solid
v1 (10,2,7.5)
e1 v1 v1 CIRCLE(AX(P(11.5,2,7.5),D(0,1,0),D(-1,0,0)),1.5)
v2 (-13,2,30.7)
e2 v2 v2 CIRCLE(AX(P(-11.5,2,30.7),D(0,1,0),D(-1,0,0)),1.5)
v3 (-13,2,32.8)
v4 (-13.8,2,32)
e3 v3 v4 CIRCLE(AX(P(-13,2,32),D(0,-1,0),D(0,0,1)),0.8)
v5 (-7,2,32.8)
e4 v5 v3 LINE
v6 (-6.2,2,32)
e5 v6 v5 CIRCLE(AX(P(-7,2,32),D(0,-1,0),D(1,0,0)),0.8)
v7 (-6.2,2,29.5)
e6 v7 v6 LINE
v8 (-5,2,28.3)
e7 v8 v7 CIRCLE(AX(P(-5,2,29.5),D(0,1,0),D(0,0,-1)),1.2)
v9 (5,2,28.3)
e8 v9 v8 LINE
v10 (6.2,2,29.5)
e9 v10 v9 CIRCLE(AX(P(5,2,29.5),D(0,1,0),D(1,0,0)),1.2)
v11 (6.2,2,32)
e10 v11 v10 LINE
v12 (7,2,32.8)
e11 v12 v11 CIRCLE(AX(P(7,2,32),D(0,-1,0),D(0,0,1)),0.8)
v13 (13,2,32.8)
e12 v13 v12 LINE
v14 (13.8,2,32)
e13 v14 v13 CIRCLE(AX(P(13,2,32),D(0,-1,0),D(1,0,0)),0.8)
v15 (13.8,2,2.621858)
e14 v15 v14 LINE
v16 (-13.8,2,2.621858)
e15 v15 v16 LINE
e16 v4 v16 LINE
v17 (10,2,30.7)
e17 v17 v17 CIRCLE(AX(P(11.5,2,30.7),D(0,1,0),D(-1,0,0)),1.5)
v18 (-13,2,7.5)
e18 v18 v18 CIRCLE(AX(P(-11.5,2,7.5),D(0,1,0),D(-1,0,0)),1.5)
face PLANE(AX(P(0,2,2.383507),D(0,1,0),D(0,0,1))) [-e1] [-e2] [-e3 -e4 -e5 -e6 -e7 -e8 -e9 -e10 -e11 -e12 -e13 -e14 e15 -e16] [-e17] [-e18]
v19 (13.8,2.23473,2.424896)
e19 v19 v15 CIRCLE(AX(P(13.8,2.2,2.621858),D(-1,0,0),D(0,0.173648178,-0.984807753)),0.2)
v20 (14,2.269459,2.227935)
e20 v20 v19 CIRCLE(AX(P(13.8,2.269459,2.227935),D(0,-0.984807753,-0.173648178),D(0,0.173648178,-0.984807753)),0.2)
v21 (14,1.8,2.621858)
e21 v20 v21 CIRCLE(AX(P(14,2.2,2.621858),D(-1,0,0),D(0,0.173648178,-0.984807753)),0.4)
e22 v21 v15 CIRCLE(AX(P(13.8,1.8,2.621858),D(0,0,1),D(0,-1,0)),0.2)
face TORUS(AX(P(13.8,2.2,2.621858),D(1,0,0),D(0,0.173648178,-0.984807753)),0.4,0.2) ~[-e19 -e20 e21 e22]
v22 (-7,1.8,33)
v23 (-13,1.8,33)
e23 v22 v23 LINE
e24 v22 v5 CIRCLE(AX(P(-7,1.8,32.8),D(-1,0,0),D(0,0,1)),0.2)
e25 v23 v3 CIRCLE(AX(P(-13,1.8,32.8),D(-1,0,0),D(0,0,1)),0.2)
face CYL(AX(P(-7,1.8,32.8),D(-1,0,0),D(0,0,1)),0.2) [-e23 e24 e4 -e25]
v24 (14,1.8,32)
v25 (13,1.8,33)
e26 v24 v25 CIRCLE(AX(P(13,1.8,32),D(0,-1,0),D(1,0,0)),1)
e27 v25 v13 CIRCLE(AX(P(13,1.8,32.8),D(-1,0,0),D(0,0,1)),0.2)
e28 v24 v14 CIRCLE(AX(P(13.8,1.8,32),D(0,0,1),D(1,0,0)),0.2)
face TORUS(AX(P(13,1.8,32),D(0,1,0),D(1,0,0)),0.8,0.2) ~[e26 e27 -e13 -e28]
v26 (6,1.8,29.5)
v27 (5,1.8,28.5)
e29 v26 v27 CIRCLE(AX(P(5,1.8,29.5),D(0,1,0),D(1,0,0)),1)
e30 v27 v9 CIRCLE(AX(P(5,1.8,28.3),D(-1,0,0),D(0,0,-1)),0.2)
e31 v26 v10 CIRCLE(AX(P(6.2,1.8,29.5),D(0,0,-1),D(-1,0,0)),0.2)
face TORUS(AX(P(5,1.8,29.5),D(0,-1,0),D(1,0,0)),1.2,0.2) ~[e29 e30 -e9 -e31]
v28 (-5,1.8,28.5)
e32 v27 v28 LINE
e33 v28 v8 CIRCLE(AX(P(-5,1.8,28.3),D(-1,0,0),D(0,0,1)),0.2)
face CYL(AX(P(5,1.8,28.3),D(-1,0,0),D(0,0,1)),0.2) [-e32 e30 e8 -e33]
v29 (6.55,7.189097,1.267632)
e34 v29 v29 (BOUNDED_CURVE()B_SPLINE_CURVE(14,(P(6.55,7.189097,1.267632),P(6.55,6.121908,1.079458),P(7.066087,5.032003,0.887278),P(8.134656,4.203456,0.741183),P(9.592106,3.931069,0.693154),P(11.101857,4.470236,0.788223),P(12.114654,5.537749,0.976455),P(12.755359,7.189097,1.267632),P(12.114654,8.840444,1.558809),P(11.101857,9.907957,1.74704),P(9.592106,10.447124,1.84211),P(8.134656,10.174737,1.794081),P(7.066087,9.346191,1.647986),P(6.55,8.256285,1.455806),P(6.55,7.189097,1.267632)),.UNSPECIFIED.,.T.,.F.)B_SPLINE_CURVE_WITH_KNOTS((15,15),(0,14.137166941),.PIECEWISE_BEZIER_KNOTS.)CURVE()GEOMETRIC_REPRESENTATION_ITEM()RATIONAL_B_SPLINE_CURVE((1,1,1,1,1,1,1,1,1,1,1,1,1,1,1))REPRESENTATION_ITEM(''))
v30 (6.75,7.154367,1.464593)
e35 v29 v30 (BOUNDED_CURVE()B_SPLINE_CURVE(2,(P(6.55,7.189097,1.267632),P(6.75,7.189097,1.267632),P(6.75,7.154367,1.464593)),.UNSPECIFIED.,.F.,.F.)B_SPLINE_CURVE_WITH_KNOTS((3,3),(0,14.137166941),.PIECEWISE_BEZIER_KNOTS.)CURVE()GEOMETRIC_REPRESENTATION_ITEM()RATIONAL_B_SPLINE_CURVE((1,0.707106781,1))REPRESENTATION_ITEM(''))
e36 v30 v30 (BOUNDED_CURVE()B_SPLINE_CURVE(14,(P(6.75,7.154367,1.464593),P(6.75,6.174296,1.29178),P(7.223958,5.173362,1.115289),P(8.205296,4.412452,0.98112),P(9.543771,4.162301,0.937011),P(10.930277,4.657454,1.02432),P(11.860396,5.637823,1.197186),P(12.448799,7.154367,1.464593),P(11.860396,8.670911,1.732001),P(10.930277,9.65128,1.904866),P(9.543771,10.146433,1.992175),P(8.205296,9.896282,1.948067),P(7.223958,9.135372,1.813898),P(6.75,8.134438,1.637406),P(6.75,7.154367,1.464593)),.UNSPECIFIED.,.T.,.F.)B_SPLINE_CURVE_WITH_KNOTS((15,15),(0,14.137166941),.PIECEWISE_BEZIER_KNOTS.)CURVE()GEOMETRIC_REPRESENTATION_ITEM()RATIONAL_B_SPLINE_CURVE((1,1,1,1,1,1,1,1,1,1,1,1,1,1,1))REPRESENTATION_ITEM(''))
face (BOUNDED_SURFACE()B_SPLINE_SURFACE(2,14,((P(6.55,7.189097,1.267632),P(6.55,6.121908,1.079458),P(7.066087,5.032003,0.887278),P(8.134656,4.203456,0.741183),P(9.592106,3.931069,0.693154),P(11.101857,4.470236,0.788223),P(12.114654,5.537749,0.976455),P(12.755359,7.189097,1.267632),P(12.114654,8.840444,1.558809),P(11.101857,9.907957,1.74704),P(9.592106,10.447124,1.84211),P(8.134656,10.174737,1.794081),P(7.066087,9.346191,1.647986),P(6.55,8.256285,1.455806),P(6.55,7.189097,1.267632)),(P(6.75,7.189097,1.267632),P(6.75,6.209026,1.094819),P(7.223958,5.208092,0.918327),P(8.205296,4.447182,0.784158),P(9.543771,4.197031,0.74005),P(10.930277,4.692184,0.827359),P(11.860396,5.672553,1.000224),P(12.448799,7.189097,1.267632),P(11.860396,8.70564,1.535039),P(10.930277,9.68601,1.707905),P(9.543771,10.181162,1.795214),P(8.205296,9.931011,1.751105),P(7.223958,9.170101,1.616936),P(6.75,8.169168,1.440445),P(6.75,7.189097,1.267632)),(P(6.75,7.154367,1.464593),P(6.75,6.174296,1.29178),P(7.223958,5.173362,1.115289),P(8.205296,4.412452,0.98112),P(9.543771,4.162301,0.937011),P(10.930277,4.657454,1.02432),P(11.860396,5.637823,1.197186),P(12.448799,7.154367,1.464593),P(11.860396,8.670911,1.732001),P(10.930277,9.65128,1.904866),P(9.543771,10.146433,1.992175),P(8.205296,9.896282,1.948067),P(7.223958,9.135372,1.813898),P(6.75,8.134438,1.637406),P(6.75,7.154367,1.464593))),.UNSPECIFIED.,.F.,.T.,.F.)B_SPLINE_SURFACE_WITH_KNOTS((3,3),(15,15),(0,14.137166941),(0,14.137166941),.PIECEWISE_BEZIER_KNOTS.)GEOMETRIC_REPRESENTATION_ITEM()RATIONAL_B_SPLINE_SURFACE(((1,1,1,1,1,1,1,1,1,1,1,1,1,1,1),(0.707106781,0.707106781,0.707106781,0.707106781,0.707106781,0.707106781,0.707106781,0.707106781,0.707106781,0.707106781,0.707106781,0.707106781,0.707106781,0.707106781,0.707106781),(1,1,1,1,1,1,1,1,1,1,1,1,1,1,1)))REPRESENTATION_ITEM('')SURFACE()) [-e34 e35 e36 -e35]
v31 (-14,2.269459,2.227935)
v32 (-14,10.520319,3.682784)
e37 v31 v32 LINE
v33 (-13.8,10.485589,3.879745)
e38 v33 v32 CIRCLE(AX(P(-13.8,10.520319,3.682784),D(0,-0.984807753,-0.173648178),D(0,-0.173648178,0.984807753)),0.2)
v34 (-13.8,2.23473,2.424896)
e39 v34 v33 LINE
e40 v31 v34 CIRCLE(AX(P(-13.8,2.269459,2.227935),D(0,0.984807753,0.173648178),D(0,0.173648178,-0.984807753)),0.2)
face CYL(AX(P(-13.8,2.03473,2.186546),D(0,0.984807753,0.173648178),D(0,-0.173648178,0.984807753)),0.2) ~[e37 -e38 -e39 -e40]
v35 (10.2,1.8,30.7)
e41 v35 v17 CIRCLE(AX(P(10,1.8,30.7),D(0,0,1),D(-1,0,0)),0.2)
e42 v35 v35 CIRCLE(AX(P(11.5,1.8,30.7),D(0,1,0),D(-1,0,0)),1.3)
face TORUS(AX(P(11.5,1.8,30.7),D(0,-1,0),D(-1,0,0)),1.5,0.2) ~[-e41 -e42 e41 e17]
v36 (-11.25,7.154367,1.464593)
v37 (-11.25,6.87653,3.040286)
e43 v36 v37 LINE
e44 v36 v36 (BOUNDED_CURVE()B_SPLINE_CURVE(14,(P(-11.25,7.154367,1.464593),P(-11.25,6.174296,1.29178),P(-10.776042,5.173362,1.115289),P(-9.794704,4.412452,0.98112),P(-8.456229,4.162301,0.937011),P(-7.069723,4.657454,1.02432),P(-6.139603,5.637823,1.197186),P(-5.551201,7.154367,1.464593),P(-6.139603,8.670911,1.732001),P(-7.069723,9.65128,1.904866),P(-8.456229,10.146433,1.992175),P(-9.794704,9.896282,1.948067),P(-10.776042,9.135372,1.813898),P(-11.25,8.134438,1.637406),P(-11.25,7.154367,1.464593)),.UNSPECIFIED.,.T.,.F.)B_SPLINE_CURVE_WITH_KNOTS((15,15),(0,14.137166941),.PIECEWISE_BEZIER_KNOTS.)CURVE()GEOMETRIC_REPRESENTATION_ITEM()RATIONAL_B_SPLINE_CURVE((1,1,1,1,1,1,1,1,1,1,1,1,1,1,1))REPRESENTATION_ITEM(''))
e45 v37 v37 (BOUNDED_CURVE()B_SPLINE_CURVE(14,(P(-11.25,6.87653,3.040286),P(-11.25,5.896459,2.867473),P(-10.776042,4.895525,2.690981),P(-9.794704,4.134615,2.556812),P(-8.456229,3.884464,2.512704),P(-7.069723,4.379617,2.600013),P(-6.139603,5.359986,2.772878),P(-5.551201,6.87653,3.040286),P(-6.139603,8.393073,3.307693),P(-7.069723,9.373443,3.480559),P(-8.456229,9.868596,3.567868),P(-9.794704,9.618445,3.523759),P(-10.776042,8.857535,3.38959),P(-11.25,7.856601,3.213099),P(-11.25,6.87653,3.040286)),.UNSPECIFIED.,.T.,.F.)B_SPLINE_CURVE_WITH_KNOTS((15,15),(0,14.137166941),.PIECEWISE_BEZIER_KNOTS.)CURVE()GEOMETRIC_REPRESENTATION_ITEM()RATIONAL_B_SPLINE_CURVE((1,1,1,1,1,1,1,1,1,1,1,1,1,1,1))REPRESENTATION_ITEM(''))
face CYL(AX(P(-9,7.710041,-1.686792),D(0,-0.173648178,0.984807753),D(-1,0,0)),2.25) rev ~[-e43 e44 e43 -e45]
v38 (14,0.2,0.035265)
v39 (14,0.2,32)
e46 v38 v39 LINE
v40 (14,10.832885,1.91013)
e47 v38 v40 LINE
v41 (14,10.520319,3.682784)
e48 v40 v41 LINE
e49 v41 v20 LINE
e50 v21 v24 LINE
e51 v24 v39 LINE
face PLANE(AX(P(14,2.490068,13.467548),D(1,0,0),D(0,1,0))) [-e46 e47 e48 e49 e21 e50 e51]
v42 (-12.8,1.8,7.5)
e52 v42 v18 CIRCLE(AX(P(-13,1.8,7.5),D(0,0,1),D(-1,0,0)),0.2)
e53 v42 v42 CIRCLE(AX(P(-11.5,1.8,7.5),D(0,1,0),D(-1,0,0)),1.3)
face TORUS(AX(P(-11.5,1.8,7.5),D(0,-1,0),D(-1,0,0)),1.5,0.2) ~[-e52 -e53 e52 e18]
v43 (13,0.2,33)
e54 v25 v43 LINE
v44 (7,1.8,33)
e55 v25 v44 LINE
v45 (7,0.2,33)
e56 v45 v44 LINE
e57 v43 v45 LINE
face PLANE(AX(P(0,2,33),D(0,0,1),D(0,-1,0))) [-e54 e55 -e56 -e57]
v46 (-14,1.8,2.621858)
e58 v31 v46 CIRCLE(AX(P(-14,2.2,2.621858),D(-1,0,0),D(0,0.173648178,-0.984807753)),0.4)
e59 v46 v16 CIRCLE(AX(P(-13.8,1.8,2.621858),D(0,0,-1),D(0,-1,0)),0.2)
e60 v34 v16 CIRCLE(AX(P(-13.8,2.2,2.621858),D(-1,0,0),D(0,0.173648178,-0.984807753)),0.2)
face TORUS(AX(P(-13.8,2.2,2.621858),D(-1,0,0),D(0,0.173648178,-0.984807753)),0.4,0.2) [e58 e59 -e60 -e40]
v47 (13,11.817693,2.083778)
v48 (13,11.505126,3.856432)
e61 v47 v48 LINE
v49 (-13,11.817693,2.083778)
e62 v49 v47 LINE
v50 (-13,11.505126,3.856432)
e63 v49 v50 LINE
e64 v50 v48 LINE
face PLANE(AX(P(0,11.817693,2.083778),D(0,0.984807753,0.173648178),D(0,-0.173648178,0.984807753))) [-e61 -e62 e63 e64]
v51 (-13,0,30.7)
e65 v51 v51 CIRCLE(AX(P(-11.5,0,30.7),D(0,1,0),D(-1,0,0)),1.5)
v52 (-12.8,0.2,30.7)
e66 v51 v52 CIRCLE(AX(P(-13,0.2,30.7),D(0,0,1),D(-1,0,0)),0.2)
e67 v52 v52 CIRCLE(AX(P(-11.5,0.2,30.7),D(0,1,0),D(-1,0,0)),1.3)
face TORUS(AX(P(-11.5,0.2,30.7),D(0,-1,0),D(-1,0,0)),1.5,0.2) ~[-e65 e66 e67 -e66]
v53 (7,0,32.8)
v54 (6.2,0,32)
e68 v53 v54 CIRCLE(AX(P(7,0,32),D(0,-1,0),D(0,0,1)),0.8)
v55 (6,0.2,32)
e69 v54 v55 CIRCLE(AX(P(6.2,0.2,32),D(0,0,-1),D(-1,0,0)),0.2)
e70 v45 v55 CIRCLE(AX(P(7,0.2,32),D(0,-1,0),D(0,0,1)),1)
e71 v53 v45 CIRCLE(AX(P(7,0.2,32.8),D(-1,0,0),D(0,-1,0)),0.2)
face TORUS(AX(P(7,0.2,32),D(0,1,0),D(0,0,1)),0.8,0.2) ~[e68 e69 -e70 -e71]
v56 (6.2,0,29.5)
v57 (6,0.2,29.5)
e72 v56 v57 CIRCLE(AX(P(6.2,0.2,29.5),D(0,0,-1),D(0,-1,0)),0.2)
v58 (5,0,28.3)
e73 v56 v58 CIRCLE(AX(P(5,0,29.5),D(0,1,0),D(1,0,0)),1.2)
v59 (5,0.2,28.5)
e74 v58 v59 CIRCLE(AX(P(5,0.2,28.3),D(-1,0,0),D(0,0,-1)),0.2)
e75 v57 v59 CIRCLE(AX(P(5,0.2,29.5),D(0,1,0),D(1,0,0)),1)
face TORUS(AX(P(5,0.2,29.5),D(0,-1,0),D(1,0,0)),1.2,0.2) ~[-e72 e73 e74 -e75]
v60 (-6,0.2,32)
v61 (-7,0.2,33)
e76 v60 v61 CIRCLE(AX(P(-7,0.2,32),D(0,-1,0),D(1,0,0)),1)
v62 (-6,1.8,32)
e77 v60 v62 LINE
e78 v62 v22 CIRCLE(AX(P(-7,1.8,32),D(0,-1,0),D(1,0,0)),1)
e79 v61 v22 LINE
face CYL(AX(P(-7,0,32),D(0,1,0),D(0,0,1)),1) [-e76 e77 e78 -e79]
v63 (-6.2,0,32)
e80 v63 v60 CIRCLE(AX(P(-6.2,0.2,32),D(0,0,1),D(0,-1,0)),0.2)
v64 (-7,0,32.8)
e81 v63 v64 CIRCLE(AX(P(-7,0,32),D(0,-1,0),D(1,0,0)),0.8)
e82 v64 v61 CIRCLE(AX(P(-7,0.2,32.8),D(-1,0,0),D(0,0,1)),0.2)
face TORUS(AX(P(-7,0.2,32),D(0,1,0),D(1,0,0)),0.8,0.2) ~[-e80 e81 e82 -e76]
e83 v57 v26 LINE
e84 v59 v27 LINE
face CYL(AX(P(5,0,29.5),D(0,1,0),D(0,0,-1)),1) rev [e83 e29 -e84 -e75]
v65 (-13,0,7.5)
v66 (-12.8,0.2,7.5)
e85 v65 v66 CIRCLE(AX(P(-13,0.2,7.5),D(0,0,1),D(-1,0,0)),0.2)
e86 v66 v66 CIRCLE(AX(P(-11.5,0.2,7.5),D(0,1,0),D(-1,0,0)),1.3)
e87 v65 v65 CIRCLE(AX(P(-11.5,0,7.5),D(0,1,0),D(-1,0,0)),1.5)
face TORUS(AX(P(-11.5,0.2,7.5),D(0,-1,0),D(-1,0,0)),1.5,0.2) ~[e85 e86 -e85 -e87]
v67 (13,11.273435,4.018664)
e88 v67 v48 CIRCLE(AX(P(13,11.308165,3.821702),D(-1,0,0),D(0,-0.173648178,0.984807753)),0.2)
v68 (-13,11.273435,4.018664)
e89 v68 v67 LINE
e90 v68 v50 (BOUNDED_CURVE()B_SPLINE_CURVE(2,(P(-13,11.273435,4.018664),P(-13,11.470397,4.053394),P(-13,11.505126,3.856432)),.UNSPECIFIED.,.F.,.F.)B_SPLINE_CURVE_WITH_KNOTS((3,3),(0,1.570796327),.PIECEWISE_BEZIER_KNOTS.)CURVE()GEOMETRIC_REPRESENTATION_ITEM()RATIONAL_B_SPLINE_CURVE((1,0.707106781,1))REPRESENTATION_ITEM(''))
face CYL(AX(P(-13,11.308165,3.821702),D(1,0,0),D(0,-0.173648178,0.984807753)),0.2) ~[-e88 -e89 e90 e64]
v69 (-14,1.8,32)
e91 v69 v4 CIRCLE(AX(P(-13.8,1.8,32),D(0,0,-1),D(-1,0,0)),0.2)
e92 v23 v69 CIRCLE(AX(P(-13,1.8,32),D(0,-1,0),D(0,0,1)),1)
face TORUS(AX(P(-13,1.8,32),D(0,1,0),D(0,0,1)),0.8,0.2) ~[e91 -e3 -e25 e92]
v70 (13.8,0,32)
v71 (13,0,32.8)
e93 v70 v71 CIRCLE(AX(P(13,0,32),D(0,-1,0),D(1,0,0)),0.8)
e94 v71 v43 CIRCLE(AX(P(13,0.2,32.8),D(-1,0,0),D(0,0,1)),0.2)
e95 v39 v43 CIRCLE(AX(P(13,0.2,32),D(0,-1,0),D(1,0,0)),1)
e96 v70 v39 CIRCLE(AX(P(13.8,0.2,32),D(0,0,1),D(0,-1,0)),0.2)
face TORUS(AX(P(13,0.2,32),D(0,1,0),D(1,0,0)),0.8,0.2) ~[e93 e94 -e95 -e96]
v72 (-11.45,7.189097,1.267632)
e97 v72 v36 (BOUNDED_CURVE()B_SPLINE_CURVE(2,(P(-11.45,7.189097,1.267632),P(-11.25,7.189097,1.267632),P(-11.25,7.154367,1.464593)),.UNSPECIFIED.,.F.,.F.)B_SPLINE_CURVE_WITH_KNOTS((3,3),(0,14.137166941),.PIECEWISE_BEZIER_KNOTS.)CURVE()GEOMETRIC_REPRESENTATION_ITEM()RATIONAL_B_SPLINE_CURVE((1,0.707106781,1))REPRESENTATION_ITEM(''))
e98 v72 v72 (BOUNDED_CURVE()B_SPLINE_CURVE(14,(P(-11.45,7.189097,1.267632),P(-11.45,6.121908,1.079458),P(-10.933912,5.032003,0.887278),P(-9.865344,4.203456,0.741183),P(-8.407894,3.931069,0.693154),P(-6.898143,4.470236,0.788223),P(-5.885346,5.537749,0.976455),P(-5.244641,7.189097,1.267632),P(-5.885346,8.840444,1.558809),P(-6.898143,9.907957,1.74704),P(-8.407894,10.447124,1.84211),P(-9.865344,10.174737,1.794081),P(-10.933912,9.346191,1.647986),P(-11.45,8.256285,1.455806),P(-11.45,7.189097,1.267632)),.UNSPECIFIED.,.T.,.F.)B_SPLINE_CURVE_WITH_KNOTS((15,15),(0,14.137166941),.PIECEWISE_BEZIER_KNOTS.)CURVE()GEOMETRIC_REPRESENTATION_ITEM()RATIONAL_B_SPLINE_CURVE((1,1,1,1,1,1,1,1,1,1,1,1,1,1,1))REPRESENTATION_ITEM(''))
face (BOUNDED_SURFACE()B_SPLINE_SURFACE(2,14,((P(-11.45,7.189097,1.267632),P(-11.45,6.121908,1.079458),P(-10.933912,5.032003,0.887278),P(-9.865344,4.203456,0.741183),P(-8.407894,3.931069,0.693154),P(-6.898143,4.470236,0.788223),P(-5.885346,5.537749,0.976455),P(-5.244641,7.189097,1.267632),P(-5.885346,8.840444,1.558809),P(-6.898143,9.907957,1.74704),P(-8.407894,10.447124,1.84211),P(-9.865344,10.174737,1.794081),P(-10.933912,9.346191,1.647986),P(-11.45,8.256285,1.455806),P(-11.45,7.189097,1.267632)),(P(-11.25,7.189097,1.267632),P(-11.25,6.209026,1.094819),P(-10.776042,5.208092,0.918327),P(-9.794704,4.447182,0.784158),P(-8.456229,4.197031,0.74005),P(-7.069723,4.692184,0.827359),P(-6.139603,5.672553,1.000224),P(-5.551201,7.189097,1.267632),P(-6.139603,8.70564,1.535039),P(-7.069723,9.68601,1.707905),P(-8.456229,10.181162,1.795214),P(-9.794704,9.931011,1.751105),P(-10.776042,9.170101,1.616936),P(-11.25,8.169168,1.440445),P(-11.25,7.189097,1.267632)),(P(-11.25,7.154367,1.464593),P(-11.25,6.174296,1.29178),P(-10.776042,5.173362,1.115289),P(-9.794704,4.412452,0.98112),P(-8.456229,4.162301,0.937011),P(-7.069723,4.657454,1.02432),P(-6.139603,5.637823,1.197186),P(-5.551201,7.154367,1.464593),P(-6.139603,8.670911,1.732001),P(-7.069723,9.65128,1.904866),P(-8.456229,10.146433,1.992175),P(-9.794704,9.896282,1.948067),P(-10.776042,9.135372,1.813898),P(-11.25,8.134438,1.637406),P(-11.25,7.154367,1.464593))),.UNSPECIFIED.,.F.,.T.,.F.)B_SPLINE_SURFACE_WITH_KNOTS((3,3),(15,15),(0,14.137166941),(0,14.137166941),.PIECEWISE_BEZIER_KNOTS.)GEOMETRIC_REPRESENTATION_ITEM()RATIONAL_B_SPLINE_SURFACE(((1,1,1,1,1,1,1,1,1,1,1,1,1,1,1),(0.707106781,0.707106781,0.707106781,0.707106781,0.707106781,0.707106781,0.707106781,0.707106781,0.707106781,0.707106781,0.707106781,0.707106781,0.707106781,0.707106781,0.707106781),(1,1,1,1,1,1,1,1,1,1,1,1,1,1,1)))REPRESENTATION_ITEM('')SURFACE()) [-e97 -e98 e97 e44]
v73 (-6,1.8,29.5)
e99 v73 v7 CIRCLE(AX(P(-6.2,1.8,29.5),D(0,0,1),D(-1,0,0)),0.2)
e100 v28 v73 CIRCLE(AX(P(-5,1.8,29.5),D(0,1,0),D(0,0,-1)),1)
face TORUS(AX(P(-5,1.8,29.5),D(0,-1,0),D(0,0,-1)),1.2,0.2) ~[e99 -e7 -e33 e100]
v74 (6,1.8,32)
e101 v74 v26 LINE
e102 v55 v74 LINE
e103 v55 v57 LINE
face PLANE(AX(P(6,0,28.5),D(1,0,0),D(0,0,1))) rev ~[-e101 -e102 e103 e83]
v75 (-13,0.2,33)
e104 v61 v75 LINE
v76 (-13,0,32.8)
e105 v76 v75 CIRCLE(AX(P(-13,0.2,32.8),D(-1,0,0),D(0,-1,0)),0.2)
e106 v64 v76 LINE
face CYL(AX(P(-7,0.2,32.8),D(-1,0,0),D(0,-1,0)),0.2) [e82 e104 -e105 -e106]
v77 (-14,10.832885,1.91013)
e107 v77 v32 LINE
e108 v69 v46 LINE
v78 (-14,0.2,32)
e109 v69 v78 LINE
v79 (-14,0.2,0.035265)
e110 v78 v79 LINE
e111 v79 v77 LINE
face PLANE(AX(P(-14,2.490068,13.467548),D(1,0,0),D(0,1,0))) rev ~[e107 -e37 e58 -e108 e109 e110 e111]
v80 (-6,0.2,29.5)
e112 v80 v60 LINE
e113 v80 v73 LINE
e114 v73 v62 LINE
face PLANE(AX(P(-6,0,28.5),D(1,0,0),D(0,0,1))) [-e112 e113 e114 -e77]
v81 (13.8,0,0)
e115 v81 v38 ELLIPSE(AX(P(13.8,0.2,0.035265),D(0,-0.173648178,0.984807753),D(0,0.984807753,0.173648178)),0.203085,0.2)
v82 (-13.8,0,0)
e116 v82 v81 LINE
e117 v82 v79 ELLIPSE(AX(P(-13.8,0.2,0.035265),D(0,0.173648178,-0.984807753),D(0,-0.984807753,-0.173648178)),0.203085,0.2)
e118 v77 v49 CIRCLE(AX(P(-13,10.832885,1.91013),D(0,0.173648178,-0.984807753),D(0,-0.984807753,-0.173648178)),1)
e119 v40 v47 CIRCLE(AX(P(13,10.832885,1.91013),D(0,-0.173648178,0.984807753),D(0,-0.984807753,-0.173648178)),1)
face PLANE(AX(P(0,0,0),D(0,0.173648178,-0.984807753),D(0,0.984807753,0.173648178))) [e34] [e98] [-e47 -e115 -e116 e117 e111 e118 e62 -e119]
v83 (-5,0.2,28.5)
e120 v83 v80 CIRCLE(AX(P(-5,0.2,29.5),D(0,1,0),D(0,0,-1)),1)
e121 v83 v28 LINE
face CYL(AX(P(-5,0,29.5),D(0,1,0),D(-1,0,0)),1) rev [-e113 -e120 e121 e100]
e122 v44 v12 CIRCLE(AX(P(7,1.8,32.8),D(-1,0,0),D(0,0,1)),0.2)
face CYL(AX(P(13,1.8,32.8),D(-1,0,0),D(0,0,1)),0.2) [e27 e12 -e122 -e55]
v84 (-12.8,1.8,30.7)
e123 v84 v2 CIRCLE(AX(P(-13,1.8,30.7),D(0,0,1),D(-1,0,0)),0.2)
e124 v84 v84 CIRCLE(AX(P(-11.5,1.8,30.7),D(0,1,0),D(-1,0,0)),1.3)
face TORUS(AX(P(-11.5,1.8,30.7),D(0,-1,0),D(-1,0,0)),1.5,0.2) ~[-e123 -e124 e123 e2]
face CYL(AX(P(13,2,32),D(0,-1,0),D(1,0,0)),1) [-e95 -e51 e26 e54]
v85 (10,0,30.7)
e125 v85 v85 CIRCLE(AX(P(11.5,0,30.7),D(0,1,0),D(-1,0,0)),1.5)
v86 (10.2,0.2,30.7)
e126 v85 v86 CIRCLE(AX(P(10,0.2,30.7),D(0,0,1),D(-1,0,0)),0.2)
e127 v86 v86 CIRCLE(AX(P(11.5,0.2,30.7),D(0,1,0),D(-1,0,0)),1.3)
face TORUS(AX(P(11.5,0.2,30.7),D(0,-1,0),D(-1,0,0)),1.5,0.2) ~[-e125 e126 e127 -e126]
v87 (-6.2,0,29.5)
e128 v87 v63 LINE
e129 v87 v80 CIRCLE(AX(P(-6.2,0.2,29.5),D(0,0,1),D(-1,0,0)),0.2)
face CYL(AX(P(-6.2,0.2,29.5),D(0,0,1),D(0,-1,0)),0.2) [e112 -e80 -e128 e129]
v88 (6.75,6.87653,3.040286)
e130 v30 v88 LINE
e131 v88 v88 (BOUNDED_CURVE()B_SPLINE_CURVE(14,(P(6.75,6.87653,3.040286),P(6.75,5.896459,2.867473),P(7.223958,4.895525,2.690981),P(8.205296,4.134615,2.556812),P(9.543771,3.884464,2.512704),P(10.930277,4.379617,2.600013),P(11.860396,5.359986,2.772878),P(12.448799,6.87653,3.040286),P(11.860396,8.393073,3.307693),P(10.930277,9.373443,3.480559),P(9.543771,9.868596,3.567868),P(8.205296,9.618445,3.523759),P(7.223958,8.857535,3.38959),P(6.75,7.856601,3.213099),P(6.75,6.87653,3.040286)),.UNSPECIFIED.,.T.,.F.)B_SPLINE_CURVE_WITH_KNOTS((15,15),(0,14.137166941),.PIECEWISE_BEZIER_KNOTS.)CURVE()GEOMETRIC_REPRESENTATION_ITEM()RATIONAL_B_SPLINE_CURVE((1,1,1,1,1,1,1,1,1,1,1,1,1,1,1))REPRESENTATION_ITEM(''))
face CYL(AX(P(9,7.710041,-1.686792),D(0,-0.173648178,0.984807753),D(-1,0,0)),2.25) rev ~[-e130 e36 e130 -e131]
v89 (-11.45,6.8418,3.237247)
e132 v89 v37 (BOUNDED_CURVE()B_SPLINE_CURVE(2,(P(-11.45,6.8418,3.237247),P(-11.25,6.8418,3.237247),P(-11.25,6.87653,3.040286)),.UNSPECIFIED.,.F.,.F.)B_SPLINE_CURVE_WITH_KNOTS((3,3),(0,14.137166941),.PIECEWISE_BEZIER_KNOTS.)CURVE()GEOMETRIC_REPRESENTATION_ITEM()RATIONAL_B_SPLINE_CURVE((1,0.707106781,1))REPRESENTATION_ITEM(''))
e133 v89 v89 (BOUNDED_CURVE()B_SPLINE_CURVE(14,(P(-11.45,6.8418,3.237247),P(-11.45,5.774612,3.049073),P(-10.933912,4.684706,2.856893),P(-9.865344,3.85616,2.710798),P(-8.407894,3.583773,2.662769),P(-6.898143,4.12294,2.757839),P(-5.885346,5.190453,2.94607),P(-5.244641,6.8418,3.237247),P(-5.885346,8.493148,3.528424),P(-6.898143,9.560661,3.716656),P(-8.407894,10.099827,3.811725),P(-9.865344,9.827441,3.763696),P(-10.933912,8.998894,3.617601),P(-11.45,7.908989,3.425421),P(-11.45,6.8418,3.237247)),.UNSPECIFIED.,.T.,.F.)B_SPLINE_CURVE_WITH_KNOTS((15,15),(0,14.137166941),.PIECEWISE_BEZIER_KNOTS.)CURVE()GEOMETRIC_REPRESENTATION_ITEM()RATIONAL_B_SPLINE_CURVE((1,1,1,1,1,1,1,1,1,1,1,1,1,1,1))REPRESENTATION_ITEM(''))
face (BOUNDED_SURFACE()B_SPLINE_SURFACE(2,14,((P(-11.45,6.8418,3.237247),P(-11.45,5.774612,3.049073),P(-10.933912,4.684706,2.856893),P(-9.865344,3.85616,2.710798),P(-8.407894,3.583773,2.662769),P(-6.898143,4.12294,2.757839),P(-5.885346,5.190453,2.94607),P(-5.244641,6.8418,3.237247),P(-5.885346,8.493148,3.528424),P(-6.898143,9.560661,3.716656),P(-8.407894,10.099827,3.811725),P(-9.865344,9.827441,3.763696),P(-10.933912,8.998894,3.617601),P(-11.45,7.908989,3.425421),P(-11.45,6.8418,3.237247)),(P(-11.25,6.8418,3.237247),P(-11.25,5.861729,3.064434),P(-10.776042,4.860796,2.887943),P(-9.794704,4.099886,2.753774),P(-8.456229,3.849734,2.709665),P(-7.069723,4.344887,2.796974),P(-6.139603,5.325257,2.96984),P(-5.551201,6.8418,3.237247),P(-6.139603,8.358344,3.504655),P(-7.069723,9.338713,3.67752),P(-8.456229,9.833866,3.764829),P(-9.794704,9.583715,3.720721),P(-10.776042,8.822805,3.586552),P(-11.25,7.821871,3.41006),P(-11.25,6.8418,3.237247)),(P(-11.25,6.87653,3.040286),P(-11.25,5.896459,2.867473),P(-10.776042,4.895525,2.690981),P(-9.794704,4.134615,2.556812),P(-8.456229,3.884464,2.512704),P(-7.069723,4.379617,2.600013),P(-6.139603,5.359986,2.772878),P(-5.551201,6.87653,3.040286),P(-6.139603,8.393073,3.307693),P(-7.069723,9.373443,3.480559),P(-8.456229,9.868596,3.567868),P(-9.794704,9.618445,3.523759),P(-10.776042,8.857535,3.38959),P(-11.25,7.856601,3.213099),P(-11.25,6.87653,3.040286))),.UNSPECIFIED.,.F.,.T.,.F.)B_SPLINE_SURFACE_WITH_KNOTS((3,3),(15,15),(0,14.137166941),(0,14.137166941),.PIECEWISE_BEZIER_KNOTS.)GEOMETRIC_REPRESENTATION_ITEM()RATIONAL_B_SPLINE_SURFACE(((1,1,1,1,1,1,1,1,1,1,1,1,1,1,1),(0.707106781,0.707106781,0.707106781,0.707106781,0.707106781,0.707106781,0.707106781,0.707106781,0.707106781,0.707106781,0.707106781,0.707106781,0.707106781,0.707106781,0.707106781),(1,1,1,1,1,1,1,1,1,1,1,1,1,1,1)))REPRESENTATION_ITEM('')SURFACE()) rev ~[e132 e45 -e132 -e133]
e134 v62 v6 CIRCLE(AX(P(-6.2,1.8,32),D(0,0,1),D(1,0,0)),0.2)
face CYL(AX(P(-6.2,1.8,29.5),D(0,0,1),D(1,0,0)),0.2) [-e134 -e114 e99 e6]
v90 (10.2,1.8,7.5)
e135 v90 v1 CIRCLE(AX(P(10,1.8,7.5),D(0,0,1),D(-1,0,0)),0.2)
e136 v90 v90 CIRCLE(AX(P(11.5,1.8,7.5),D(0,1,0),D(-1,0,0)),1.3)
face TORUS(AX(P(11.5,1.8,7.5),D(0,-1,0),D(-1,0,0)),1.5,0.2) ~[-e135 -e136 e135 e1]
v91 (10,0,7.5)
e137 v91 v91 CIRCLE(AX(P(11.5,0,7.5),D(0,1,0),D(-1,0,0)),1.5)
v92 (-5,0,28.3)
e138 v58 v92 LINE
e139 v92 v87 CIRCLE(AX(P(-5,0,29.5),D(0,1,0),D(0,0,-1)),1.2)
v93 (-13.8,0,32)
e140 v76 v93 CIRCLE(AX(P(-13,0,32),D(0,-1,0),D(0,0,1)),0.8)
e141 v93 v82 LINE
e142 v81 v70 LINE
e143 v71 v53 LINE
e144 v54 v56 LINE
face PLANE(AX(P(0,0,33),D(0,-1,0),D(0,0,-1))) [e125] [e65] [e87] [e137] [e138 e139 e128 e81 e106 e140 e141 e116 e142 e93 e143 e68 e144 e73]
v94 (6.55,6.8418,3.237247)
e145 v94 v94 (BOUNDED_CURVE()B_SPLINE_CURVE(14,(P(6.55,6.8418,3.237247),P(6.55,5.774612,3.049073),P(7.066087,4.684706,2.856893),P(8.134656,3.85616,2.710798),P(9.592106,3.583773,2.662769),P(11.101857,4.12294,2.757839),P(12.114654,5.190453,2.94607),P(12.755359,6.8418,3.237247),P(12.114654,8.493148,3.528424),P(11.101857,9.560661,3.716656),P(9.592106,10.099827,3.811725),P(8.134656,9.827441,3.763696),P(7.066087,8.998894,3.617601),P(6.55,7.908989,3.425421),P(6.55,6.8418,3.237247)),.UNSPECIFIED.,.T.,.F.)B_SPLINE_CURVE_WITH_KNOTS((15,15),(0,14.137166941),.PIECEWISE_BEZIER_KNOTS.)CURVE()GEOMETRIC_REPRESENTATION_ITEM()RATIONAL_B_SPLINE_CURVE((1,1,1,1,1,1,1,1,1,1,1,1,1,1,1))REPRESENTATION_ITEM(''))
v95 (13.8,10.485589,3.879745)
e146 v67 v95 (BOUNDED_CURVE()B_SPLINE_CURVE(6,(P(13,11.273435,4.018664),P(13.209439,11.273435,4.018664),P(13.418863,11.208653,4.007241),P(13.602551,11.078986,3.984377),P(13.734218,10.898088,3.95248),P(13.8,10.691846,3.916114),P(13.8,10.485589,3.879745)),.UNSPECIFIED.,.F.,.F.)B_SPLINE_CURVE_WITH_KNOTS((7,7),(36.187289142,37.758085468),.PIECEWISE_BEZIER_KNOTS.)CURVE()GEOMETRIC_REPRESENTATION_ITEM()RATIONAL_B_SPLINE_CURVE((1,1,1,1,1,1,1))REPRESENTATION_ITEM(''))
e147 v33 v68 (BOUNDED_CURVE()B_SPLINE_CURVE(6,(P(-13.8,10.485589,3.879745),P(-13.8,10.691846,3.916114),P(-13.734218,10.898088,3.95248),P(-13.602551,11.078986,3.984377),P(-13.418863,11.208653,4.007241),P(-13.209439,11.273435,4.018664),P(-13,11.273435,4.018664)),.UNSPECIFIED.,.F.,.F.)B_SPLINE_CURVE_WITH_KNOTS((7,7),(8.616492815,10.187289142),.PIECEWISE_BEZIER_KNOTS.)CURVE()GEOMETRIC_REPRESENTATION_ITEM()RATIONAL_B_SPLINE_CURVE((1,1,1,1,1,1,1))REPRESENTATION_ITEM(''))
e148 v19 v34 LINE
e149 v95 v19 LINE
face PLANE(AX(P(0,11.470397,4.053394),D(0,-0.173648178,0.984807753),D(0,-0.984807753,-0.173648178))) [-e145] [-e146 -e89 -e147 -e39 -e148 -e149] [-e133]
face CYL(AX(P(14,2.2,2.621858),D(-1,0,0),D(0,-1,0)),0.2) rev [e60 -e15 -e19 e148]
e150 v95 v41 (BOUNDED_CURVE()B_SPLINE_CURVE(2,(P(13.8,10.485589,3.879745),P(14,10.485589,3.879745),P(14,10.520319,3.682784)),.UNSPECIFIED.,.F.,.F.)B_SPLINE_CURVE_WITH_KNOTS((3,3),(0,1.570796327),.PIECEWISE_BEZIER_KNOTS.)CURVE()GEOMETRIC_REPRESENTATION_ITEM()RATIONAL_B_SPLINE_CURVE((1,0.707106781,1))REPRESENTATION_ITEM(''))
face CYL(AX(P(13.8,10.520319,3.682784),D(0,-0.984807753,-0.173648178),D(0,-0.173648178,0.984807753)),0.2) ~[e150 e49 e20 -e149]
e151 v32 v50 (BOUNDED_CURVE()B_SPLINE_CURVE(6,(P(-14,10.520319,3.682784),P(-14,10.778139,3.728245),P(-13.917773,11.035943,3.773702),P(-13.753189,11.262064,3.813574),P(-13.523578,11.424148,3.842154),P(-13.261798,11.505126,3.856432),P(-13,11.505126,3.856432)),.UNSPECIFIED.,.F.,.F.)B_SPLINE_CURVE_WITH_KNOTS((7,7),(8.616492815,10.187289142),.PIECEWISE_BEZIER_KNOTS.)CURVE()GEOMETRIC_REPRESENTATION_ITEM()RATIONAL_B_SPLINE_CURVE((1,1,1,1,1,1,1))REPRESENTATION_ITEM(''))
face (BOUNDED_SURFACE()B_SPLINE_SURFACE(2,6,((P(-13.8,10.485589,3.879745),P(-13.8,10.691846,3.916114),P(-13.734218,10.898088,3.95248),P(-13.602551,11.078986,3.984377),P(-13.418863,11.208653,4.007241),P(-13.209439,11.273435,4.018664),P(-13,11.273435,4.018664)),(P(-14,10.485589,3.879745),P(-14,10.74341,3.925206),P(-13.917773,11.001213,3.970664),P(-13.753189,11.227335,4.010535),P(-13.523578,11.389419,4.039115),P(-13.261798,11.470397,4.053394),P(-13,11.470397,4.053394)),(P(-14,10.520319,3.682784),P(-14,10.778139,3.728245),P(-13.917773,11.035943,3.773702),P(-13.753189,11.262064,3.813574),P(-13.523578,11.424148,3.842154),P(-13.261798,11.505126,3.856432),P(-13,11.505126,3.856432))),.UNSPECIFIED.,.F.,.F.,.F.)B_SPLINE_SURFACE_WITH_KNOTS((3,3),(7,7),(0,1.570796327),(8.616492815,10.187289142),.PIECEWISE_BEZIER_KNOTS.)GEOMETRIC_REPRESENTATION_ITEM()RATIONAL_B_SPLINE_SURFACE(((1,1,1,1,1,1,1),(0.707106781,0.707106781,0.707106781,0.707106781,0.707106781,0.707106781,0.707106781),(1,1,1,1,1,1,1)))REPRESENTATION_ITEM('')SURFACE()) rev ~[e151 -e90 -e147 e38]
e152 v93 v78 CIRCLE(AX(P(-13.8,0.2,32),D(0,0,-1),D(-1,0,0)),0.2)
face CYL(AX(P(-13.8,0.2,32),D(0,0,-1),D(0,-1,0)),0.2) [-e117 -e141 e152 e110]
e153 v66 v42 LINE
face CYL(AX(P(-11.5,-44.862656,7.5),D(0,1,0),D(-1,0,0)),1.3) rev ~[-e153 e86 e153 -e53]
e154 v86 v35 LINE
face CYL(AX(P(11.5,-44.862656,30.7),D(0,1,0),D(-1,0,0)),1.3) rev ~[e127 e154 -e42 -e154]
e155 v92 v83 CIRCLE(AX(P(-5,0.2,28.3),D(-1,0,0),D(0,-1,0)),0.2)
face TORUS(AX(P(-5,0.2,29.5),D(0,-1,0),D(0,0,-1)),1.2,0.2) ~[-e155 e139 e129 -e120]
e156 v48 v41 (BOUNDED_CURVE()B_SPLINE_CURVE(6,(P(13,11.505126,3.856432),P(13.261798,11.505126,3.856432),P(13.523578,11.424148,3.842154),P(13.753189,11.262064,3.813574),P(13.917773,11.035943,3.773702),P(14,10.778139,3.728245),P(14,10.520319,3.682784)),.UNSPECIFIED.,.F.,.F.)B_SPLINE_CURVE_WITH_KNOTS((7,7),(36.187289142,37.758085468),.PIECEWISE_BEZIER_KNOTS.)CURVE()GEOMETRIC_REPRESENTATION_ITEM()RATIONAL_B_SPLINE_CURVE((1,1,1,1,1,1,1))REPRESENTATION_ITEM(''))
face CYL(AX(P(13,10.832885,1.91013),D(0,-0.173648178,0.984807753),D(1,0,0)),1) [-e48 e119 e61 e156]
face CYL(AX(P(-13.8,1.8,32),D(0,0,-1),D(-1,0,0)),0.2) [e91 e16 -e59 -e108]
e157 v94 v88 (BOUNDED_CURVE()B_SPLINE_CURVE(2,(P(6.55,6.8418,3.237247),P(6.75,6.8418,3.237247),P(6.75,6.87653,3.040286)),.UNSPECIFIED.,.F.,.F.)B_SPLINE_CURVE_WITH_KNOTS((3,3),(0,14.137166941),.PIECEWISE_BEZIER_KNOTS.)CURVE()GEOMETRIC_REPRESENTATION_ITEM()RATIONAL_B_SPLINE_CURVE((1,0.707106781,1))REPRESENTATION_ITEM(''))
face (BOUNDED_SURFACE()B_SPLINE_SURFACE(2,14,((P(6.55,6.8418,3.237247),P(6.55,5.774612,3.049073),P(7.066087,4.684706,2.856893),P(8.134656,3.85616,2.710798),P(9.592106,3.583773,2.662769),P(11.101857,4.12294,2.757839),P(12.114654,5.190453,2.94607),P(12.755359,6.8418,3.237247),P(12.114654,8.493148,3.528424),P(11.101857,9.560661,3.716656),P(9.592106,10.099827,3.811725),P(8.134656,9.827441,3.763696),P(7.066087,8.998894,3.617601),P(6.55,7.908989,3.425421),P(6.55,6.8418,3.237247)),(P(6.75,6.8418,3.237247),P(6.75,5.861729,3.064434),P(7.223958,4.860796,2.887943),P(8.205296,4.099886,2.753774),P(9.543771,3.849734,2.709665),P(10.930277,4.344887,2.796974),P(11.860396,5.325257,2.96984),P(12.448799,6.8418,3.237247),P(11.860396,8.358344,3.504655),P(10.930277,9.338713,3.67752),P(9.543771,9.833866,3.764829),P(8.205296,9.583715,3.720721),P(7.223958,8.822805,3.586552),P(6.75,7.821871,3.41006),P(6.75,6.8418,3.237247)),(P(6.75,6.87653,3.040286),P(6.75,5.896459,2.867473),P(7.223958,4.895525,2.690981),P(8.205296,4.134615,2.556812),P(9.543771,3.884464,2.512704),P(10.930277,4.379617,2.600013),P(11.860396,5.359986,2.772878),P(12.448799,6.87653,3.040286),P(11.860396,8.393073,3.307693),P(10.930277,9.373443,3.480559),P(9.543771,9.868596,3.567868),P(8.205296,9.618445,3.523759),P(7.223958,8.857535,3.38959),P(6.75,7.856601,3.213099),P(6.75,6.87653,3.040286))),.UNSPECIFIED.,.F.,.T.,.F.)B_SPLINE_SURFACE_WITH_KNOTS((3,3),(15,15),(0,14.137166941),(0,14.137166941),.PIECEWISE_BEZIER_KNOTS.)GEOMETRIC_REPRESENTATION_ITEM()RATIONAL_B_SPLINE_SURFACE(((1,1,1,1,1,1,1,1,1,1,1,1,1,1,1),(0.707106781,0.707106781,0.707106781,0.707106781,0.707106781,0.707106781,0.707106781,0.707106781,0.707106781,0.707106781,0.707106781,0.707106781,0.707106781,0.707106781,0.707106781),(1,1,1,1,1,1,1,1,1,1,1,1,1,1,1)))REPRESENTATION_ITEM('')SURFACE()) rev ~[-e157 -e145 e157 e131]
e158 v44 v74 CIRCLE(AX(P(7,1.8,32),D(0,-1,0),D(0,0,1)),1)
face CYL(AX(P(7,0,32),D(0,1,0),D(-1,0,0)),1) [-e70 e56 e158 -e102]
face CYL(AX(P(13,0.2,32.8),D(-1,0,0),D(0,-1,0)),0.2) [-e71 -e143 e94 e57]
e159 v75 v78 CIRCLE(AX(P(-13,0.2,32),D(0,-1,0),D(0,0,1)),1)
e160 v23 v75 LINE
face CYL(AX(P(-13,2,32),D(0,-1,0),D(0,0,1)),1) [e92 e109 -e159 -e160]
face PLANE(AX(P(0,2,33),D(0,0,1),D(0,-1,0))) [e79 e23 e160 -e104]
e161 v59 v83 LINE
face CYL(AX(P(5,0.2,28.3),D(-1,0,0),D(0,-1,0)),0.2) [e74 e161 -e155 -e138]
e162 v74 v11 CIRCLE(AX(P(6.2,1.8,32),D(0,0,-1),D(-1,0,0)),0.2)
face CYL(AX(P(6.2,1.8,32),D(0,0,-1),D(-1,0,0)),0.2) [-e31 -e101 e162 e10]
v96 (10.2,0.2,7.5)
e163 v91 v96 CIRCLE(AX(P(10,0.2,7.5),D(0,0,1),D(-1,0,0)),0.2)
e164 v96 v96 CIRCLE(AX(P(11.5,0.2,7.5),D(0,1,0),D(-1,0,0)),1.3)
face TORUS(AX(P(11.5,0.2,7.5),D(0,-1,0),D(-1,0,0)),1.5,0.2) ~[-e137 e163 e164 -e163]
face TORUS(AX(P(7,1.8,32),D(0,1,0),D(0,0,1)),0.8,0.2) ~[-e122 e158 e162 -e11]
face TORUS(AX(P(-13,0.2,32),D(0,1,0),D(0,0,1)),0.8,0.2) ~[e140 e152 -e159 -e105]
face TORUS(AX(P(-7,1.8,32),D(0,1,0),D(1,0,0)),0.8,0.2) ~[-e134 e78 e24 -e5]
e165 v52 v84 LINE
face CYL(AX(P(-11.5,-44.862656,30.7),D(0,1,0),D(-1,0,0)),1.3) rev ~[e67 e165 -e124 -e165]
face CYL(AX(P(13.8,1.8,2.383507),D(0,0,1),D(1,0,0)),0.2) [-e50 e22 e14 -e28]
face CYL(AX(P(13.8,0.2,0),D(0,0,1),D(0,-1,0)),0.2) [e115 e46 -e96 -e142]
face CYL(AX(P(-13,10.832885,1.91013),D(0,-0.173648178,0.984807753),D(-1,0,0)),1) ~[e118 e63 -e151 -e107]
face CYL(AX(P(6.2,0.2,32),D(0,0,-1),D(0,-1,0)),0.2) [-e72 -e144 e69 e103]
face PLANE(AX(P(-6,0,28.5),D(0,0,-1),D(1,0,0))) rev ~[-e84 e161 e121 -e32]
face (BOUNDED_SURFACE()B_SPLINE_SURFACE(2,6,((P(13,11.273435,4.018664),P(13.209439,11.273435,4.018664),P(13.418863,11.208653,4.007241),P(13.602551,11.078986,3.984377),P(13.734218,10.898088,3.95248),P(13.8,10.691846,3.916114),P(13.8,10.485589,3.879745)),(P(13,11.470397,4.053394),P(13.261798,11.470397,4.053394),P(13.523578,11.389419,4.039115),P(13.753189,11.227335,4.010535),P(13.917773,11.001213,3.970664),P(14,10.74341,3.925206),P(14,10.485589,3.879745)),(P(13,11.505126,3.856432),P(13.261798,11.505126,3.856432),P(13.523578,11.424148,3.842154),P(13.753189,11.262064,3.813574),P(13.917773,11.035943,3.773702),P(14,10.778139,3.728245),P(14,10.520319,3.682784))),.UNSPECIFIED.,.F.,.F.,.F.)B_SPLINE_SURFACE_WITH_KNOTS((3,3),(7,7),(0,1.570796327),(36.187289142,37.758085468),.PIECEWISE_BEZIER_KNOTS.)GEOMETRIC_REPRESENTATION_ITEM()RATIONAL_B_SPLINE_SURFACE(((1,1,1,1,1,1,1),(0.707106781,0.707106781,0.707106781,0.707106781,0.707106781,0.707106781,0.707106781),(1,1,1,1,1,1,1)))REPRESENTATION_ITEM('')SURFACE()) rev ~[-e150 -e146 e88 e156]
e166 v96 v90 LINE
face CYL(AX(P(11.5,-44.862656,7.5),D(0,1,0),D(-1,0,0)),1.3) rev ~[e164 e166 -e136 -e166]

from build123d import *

# Parameters (mm, degrees)
F1_DEPTH = 14
F2_W     = 12
F2_H     = 4.5
F3_DEPTH = 25
F4_D     = 2.6
F6_D     = 4.5
F6_DEPTH = 3
F6_TIP   = 1.3519363928
F7_R     = 1
F8_R     = 0.2


# Not quite as in the source:
# - a feature names something its author has since deleted; it is built from what else it names


with BuildPart() as f1:
    # F0 (on Right) → F1 (new body, symmetric)
    with BuildSketch(Plane.YZ):
        Polygon((0, 33), (0, 0), (11.8176930361, 2.083778132), (11.4703966808, 4.053393638), (2, 2.3835071852), (2, 33), align=None)
    extrude(amount=F1_DEPTH, both=True)

    # F2 (on Front) → F3 (cut)
    with BuildSketch(Plane.XZ):
        with Locations((0, 30.75)):
            Rectangle(F2_W, F2_H)
    extrude(amount=-F3_DEPTH, mode=Mode.SUBTRACT)

    # F4 (through all)
    with Locations(Plane.XZ):
        with Locations((-11.5, 30.7), (11.5, 30.7), (11.5, 7.5), (-11.5, 7.5)):
            Hole(F4_D / 2)

    # F6
    with Locations(Plane(origin=(0, 0, 0), x_dir=(1, 0, 0), z_dir=(0, 0.1736481777, -0.984807753))):
        with Locations((-8.9999996126, -7.3), (9, -7.3)):
            Hole(F6_D / 2, depth=F6_DEPTH)
            with Locations((0, 0, -(F6_DEPTH + F6_TIP / 2))):  # 118° drill point
                Cone(0, F6_D / 2, F6_TIP, mode=Mode.SUBTRACT)

    # F7
    f7_edges = [f1.edges().sort_by_distance(p)[0] for p in [
        (-14, 1, 33),
        (14, 1, 33),
        (14, 11.644045, 3.068586),
        (-14, 11.644045, 3.068586),
        (6, 1, 33),
        (-6, 1, 33),
        (6, 1, 28.5),
        (-6, 1, 28.5),
    ]]
    fillet(f7_edges, radius=F7_R)

    # F8
    f8_edges = [f1.edges().sort_by_distance(p)[0] for p in [
        (14, 2, 17.191754),
        (13.707107, 2, 32.707107),
        (0, 2, 2.383507),
        (10, 2, 33),
        (-14, 2, 17.191754),
        (6.292893, 2, 32.707107),
        (-13.707107, 2, 32.707107),
        (6, 2, 30.75),
        (-10, 2, 33),
        (5.707107, 2, 28.792893),
        (-6.292893, 2, 32.707107),
        (0, 2, 28.5),
        (-6, 2, 30.75),
        (-5.707107, 2, 28.792893),
        (-12.8, 2, 7.5),
        (-12.8, 2, 30.7),
        (10.2, 2, 7.5),
        (10.2, 2, 30.7),
        (0, 11.470397, 4.053394),
        (-13.707107, 11.181953, 4.002533),
        (13.707107, 11.181953, 4.002533),
        (-14, 6.242794, 3.131626),
        (14, 6.242794, 3.131626),
        (-11.25, 6.8418, 3.237247),
        (6.75, 6.8418, 3.237247),
        (-10, 0, 33),
        (-6, 0, 30.75),
        (0, 0, 28.5),
        (6, 0, 30.75),
        (10, 0, 33),
        (14, 0, 16),
        (-14, 0, 16),
        (-6.292893, 0, 32.707107),
        (-13.707107, 0, 32.707107),
        (-5.707107, 0, 28.792893),
        (5.707107, 0, 28.792893),
        (13.707107, 0, 32.707107),
        (6.292893, 0, 32.707107),
        (-12.8, 0, 30.7),
        (-12.8, 0, 7.5),
        (10.2, 0, 30.7),
        (10.2, 0, 7.5),
        (-11.25, 7.189097, 1.267632),
        (6.75, 7.189097, 1.267632),
    ]]
    fillet(f8_edges, radius=F8_R)


solid = f1.part
